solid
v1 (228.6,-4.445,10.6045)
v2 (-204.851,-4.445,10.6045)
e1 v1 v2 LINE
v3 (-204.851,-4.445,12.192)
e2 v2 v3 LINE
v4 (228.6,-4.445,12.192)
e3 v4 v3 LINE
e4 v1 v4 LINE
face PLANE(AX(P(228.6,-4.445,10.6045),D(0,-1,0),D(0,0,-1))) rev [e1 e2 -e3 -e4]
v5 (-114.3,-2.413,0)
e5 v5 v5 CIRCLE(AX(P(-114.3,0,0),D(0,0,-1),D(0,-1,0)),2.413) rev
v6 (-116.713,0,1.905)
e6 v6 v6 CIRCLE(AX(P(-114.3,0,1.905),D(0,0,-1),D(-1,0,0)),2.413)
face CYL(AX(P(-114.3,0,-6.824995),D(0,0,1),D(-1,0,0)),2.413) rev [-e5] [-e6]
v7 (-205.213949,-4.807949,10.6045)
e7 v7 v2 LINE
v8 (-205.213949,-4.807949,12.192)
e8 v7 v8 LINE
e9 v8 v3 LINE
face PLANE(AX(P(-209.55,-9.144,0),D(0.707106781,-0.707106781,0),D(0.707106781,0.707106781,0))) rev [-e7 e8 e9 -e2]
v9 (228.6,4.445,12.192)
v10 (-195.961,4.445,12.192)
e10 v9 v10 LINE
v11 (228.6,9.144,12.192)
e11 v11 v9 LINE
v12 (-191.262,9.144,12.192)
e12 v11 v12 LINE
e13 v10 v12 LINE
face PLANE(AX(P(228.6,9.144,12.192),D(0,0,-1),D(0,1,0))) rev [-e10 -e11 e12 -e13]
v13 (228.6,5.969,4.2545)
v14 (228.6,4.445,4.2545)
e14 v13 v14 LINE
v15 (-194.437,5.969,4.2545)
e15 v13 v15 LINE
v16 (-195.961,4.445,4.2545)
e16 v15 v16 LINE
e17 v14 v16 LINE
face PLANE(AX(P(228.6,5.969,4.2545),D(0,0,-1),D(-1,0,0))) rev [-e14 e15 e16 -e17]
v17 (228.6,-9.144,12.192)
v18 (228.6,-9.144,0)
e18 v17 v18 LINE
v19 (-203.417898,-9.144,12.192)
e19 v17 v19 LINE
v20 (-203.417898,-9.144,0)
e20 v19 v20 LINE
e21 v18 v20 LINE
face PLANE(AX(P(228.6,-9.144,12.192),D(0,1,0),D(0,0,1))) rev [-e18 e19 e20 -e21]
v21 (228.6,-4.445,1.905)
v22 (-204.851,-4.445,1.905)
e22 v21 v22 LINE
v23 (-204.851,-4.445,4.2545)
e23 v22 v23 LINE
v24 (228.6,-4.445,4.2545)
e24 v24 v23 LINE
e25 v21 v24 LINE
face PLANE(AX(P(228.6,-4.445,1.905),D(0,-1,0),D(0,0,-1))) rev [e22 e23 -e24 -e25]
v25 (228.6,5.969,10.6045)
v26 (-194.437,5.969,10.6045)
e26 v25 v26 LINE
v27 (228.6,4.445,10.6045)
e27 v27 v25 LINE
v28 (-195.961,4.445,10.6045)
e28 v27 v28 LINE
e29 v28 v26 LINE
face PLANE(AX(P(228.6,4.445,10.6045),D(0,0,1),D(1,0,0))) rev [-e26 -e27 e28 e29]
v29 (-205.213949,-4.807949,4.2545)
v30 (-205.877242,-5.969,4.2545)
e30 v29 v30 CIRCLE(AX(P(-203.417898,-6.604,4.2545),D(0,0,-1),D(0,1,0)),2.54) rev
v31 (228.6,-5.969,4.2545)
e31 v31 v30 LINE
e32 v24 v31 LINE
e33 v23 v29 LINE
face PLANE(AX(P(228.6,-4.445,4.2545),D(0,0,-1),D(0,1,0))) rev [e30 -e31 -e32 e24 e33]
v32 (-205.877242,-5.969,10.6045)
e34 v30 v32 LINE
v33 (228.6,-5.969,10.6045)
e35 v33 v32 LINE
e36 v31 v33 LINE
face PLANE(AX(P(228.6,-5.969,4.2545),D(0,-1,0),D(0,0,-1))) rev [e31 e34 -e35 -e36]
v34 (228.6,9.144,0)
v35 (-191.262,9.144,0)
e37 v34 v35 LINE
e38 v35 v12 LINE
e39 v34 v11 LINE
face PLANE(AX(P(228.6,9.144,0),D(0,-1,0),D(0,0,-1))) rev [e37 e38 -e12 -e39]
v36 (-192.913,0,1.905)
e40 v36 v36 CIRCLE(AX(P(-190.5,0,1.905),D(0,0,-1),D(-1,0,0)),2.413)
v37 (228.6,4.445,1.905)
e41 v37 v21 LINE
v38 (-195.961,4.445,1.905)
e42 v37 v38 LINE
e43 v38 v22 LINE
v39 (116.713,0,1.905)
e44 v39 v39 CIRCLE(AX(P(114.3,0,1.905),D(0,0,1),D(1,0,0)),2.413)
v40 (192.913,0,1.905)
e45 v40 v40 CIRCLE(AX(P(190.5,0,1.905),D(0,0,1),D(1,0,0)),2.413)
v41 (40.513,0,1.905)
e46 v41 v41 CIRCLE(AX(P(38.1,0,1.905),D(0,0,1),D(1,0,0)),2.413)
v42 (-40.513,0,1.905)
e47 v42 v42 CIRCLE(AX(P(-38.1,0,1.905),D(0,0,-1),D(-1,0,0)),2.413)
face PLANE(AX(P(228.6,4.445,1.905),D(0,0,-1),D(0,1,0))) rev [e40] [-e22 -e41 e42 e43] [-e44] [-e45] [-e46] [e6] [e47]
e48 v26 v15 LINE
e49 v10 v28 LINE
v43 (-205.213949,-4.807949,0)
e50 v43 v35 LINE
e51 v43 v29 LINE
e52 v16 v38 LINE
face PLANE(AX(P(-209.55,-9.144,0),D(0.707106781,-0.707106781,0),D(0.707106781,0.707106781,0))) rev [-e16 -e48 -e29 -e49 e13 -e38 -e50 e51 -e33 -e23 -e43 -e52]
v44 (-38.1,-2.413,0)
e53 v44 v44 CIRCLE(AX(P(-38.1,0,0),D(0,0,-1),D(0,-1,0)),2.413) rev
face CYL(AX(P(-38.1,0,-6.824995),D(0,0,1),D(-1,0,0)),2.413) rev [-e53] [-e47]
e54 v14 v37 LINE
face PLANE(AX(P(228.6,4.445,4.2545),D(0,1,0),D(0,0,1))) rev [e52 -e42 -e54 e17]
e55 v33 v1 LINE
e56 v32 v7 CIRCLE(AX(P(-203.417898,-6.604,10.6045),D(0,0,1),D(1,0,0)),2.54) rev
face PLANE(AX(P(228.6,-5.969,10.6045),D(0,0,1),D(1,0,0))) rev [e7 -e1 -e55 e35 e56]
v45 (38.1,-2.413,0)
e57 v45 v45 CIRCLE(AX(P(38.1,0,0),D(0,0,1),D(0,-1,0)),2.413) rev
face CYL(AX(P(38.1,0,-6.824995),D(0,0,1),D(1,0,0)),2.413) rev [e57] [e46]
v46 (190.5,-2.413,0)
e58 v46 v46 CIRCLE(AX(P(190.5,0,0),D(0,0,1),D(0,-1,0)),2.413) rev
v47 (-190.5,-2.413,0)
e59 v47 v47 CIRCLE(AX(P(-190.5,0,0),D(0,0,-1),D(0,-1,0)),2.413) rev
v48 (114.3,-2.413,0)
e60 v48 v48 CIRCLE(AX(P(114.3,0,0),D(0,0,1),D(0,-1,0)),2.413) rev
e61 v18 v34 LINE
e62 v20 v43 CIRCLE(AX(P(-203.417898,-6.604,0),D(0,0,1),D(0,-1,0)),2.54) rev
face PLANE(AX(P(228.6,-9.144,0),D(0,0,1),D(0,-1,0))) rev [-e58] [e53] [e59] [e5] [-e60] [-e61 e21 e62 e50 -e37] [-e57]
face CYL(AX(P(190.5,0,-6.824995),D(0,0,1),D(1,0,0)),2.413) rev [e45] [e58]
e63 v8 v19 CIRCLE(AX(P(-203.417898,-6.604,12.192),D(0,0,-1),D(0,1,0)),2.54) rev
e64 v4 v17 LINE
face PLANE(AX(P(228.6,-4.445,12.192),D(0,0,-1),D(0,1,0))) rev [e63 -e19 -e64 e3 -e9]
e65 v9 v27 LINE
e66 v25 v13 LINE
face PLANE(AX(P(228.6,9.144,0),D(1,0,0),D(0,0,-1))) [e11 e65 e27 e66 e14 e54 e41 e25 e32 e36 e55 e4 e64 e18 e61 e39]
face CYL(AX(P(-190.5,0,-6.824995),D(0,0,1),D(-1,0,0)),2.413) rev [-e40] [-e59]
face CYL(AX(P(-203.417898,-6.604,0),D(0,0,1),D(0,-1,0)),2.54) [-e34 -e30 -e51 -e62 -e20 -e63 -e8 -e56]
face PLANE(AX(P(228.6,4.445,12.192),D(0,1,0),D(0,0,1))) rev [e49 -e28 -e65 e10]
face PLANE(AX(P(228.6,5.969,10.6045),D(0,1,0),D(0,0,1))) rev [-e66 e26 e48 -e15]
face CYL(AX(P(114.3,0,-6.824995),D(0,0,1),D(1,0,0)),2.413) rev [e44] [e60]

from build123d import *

# Parameters (mm, degrees)
BOSS_EXTRUDE1_DEPTH = 228.6
SKETCH3_R           = 2.413
CUT_EXTRUDE1_DEPTH  = 1.905
LPATTERN1_COUNT     = 3
LPATTERN1_PITCH     = 76.2
CUT_EXTRUDE3_DEPTH  = 230.107436806
FILLET1_R           = 2.54


with BuildPart() as part:
    # Sketch2 → Boss-Extrude1 (new, symmetric)
    with BuildSketch(Plane(origin=(0, 0, 0), x_dir=(0, 0, -1), z_dir=(1, 0, 0))):
        Polygon((0, 9.144), (-12.192, 9.144), (-12.192, 4.445), (-10.6045, 4.445), (-10.6045, 5.969), (-4.2545, 5.969), (-4.2545, 4.445), (-1.905, 4.445), (-1.905, -4.445), (-4.2545, -4.445), (-4.2545, -5.969), (-10.6045, -5.969), (-10.6045, -4.445), (-12.192, -4.445), (-12.192, -9.144), (0, -9.144), align=None)
    extrude(amount=BOSS_EXTRUDE1_DEPTH, both=True)

    # Sketch3 → Cut-Extrude1 (cut)
    with BuildSketch(Plane.XY.offset(1.905)):
        with Locations((38.1, 0)):
            Circle(SKETCH3_R)
    cut_extrude1 = extrude(amount=-CUT_EXTRUDE1_DEPTH, mode=Mode.SUBTRACT)

    # LPattern1: Cut-Extrude1 ×3
    with Locations(*[(i * LPATTERN1_PITCH, 0, 0) for i in range(1, LPATTERN1_COUNT)]):
        add(cut_extrude1, mode=Mode.SUBTRACT)

    # SurfaceCut1
    split(bisect_by=Plane(origin=(0, 0, 0), x_dir=(0, 0, -1), z_dir=(1, 0, 0)), keep=Keep.TOP)

    # Mirror1: part across plane


with BuildPart() as part_1:
    add(part.part)
    add(part.part.mirror(Plane(origin=(0, 0, 0), x_dir=(0, 0, 1), z_dir=(1, 0, 0))))

    # Sketch4 → Cut-Extrude3 (cut, through all)
    with BuildSketch(Plane.XY.offset(12.192)):
        Polygon((-209.55, -9.144), (-191.262, 9.144), (-228.6, 9.144), (-228.6, -9.144), align=None)
    extrude(amount=-CUT_EXTRUDE3_DEPTH, mode=Mode.SUBTRACT)

    # Fillet1
    # the kernel refuses this fillet: 2.54 mm, written as the material it takes off along each edge
    with BuildSketch(Plane(origin=(-209.55, -9.144, 27.522256121), x_dir=(0.7071067811865455, 0.7071067811865496, 0), z_dir=(0, 0, -1))) as fillet1_piece_1:
        with BuildLine():
            CenterArc((FILLET1_R * 2.41421356237, FILLET1_R), FILLET1_R, 135, 135)
            Line((FILLET1_R * 1.70710678119, FILLET1_R * 1.70710678119), (0, 0))
            Line((0, 0), (FILLET1_R * 2.41421356237, 0))
        make_face()
    extrude(amount=42.852512242, mode=Mode.SUBTRACT)


solid = part_1.part
